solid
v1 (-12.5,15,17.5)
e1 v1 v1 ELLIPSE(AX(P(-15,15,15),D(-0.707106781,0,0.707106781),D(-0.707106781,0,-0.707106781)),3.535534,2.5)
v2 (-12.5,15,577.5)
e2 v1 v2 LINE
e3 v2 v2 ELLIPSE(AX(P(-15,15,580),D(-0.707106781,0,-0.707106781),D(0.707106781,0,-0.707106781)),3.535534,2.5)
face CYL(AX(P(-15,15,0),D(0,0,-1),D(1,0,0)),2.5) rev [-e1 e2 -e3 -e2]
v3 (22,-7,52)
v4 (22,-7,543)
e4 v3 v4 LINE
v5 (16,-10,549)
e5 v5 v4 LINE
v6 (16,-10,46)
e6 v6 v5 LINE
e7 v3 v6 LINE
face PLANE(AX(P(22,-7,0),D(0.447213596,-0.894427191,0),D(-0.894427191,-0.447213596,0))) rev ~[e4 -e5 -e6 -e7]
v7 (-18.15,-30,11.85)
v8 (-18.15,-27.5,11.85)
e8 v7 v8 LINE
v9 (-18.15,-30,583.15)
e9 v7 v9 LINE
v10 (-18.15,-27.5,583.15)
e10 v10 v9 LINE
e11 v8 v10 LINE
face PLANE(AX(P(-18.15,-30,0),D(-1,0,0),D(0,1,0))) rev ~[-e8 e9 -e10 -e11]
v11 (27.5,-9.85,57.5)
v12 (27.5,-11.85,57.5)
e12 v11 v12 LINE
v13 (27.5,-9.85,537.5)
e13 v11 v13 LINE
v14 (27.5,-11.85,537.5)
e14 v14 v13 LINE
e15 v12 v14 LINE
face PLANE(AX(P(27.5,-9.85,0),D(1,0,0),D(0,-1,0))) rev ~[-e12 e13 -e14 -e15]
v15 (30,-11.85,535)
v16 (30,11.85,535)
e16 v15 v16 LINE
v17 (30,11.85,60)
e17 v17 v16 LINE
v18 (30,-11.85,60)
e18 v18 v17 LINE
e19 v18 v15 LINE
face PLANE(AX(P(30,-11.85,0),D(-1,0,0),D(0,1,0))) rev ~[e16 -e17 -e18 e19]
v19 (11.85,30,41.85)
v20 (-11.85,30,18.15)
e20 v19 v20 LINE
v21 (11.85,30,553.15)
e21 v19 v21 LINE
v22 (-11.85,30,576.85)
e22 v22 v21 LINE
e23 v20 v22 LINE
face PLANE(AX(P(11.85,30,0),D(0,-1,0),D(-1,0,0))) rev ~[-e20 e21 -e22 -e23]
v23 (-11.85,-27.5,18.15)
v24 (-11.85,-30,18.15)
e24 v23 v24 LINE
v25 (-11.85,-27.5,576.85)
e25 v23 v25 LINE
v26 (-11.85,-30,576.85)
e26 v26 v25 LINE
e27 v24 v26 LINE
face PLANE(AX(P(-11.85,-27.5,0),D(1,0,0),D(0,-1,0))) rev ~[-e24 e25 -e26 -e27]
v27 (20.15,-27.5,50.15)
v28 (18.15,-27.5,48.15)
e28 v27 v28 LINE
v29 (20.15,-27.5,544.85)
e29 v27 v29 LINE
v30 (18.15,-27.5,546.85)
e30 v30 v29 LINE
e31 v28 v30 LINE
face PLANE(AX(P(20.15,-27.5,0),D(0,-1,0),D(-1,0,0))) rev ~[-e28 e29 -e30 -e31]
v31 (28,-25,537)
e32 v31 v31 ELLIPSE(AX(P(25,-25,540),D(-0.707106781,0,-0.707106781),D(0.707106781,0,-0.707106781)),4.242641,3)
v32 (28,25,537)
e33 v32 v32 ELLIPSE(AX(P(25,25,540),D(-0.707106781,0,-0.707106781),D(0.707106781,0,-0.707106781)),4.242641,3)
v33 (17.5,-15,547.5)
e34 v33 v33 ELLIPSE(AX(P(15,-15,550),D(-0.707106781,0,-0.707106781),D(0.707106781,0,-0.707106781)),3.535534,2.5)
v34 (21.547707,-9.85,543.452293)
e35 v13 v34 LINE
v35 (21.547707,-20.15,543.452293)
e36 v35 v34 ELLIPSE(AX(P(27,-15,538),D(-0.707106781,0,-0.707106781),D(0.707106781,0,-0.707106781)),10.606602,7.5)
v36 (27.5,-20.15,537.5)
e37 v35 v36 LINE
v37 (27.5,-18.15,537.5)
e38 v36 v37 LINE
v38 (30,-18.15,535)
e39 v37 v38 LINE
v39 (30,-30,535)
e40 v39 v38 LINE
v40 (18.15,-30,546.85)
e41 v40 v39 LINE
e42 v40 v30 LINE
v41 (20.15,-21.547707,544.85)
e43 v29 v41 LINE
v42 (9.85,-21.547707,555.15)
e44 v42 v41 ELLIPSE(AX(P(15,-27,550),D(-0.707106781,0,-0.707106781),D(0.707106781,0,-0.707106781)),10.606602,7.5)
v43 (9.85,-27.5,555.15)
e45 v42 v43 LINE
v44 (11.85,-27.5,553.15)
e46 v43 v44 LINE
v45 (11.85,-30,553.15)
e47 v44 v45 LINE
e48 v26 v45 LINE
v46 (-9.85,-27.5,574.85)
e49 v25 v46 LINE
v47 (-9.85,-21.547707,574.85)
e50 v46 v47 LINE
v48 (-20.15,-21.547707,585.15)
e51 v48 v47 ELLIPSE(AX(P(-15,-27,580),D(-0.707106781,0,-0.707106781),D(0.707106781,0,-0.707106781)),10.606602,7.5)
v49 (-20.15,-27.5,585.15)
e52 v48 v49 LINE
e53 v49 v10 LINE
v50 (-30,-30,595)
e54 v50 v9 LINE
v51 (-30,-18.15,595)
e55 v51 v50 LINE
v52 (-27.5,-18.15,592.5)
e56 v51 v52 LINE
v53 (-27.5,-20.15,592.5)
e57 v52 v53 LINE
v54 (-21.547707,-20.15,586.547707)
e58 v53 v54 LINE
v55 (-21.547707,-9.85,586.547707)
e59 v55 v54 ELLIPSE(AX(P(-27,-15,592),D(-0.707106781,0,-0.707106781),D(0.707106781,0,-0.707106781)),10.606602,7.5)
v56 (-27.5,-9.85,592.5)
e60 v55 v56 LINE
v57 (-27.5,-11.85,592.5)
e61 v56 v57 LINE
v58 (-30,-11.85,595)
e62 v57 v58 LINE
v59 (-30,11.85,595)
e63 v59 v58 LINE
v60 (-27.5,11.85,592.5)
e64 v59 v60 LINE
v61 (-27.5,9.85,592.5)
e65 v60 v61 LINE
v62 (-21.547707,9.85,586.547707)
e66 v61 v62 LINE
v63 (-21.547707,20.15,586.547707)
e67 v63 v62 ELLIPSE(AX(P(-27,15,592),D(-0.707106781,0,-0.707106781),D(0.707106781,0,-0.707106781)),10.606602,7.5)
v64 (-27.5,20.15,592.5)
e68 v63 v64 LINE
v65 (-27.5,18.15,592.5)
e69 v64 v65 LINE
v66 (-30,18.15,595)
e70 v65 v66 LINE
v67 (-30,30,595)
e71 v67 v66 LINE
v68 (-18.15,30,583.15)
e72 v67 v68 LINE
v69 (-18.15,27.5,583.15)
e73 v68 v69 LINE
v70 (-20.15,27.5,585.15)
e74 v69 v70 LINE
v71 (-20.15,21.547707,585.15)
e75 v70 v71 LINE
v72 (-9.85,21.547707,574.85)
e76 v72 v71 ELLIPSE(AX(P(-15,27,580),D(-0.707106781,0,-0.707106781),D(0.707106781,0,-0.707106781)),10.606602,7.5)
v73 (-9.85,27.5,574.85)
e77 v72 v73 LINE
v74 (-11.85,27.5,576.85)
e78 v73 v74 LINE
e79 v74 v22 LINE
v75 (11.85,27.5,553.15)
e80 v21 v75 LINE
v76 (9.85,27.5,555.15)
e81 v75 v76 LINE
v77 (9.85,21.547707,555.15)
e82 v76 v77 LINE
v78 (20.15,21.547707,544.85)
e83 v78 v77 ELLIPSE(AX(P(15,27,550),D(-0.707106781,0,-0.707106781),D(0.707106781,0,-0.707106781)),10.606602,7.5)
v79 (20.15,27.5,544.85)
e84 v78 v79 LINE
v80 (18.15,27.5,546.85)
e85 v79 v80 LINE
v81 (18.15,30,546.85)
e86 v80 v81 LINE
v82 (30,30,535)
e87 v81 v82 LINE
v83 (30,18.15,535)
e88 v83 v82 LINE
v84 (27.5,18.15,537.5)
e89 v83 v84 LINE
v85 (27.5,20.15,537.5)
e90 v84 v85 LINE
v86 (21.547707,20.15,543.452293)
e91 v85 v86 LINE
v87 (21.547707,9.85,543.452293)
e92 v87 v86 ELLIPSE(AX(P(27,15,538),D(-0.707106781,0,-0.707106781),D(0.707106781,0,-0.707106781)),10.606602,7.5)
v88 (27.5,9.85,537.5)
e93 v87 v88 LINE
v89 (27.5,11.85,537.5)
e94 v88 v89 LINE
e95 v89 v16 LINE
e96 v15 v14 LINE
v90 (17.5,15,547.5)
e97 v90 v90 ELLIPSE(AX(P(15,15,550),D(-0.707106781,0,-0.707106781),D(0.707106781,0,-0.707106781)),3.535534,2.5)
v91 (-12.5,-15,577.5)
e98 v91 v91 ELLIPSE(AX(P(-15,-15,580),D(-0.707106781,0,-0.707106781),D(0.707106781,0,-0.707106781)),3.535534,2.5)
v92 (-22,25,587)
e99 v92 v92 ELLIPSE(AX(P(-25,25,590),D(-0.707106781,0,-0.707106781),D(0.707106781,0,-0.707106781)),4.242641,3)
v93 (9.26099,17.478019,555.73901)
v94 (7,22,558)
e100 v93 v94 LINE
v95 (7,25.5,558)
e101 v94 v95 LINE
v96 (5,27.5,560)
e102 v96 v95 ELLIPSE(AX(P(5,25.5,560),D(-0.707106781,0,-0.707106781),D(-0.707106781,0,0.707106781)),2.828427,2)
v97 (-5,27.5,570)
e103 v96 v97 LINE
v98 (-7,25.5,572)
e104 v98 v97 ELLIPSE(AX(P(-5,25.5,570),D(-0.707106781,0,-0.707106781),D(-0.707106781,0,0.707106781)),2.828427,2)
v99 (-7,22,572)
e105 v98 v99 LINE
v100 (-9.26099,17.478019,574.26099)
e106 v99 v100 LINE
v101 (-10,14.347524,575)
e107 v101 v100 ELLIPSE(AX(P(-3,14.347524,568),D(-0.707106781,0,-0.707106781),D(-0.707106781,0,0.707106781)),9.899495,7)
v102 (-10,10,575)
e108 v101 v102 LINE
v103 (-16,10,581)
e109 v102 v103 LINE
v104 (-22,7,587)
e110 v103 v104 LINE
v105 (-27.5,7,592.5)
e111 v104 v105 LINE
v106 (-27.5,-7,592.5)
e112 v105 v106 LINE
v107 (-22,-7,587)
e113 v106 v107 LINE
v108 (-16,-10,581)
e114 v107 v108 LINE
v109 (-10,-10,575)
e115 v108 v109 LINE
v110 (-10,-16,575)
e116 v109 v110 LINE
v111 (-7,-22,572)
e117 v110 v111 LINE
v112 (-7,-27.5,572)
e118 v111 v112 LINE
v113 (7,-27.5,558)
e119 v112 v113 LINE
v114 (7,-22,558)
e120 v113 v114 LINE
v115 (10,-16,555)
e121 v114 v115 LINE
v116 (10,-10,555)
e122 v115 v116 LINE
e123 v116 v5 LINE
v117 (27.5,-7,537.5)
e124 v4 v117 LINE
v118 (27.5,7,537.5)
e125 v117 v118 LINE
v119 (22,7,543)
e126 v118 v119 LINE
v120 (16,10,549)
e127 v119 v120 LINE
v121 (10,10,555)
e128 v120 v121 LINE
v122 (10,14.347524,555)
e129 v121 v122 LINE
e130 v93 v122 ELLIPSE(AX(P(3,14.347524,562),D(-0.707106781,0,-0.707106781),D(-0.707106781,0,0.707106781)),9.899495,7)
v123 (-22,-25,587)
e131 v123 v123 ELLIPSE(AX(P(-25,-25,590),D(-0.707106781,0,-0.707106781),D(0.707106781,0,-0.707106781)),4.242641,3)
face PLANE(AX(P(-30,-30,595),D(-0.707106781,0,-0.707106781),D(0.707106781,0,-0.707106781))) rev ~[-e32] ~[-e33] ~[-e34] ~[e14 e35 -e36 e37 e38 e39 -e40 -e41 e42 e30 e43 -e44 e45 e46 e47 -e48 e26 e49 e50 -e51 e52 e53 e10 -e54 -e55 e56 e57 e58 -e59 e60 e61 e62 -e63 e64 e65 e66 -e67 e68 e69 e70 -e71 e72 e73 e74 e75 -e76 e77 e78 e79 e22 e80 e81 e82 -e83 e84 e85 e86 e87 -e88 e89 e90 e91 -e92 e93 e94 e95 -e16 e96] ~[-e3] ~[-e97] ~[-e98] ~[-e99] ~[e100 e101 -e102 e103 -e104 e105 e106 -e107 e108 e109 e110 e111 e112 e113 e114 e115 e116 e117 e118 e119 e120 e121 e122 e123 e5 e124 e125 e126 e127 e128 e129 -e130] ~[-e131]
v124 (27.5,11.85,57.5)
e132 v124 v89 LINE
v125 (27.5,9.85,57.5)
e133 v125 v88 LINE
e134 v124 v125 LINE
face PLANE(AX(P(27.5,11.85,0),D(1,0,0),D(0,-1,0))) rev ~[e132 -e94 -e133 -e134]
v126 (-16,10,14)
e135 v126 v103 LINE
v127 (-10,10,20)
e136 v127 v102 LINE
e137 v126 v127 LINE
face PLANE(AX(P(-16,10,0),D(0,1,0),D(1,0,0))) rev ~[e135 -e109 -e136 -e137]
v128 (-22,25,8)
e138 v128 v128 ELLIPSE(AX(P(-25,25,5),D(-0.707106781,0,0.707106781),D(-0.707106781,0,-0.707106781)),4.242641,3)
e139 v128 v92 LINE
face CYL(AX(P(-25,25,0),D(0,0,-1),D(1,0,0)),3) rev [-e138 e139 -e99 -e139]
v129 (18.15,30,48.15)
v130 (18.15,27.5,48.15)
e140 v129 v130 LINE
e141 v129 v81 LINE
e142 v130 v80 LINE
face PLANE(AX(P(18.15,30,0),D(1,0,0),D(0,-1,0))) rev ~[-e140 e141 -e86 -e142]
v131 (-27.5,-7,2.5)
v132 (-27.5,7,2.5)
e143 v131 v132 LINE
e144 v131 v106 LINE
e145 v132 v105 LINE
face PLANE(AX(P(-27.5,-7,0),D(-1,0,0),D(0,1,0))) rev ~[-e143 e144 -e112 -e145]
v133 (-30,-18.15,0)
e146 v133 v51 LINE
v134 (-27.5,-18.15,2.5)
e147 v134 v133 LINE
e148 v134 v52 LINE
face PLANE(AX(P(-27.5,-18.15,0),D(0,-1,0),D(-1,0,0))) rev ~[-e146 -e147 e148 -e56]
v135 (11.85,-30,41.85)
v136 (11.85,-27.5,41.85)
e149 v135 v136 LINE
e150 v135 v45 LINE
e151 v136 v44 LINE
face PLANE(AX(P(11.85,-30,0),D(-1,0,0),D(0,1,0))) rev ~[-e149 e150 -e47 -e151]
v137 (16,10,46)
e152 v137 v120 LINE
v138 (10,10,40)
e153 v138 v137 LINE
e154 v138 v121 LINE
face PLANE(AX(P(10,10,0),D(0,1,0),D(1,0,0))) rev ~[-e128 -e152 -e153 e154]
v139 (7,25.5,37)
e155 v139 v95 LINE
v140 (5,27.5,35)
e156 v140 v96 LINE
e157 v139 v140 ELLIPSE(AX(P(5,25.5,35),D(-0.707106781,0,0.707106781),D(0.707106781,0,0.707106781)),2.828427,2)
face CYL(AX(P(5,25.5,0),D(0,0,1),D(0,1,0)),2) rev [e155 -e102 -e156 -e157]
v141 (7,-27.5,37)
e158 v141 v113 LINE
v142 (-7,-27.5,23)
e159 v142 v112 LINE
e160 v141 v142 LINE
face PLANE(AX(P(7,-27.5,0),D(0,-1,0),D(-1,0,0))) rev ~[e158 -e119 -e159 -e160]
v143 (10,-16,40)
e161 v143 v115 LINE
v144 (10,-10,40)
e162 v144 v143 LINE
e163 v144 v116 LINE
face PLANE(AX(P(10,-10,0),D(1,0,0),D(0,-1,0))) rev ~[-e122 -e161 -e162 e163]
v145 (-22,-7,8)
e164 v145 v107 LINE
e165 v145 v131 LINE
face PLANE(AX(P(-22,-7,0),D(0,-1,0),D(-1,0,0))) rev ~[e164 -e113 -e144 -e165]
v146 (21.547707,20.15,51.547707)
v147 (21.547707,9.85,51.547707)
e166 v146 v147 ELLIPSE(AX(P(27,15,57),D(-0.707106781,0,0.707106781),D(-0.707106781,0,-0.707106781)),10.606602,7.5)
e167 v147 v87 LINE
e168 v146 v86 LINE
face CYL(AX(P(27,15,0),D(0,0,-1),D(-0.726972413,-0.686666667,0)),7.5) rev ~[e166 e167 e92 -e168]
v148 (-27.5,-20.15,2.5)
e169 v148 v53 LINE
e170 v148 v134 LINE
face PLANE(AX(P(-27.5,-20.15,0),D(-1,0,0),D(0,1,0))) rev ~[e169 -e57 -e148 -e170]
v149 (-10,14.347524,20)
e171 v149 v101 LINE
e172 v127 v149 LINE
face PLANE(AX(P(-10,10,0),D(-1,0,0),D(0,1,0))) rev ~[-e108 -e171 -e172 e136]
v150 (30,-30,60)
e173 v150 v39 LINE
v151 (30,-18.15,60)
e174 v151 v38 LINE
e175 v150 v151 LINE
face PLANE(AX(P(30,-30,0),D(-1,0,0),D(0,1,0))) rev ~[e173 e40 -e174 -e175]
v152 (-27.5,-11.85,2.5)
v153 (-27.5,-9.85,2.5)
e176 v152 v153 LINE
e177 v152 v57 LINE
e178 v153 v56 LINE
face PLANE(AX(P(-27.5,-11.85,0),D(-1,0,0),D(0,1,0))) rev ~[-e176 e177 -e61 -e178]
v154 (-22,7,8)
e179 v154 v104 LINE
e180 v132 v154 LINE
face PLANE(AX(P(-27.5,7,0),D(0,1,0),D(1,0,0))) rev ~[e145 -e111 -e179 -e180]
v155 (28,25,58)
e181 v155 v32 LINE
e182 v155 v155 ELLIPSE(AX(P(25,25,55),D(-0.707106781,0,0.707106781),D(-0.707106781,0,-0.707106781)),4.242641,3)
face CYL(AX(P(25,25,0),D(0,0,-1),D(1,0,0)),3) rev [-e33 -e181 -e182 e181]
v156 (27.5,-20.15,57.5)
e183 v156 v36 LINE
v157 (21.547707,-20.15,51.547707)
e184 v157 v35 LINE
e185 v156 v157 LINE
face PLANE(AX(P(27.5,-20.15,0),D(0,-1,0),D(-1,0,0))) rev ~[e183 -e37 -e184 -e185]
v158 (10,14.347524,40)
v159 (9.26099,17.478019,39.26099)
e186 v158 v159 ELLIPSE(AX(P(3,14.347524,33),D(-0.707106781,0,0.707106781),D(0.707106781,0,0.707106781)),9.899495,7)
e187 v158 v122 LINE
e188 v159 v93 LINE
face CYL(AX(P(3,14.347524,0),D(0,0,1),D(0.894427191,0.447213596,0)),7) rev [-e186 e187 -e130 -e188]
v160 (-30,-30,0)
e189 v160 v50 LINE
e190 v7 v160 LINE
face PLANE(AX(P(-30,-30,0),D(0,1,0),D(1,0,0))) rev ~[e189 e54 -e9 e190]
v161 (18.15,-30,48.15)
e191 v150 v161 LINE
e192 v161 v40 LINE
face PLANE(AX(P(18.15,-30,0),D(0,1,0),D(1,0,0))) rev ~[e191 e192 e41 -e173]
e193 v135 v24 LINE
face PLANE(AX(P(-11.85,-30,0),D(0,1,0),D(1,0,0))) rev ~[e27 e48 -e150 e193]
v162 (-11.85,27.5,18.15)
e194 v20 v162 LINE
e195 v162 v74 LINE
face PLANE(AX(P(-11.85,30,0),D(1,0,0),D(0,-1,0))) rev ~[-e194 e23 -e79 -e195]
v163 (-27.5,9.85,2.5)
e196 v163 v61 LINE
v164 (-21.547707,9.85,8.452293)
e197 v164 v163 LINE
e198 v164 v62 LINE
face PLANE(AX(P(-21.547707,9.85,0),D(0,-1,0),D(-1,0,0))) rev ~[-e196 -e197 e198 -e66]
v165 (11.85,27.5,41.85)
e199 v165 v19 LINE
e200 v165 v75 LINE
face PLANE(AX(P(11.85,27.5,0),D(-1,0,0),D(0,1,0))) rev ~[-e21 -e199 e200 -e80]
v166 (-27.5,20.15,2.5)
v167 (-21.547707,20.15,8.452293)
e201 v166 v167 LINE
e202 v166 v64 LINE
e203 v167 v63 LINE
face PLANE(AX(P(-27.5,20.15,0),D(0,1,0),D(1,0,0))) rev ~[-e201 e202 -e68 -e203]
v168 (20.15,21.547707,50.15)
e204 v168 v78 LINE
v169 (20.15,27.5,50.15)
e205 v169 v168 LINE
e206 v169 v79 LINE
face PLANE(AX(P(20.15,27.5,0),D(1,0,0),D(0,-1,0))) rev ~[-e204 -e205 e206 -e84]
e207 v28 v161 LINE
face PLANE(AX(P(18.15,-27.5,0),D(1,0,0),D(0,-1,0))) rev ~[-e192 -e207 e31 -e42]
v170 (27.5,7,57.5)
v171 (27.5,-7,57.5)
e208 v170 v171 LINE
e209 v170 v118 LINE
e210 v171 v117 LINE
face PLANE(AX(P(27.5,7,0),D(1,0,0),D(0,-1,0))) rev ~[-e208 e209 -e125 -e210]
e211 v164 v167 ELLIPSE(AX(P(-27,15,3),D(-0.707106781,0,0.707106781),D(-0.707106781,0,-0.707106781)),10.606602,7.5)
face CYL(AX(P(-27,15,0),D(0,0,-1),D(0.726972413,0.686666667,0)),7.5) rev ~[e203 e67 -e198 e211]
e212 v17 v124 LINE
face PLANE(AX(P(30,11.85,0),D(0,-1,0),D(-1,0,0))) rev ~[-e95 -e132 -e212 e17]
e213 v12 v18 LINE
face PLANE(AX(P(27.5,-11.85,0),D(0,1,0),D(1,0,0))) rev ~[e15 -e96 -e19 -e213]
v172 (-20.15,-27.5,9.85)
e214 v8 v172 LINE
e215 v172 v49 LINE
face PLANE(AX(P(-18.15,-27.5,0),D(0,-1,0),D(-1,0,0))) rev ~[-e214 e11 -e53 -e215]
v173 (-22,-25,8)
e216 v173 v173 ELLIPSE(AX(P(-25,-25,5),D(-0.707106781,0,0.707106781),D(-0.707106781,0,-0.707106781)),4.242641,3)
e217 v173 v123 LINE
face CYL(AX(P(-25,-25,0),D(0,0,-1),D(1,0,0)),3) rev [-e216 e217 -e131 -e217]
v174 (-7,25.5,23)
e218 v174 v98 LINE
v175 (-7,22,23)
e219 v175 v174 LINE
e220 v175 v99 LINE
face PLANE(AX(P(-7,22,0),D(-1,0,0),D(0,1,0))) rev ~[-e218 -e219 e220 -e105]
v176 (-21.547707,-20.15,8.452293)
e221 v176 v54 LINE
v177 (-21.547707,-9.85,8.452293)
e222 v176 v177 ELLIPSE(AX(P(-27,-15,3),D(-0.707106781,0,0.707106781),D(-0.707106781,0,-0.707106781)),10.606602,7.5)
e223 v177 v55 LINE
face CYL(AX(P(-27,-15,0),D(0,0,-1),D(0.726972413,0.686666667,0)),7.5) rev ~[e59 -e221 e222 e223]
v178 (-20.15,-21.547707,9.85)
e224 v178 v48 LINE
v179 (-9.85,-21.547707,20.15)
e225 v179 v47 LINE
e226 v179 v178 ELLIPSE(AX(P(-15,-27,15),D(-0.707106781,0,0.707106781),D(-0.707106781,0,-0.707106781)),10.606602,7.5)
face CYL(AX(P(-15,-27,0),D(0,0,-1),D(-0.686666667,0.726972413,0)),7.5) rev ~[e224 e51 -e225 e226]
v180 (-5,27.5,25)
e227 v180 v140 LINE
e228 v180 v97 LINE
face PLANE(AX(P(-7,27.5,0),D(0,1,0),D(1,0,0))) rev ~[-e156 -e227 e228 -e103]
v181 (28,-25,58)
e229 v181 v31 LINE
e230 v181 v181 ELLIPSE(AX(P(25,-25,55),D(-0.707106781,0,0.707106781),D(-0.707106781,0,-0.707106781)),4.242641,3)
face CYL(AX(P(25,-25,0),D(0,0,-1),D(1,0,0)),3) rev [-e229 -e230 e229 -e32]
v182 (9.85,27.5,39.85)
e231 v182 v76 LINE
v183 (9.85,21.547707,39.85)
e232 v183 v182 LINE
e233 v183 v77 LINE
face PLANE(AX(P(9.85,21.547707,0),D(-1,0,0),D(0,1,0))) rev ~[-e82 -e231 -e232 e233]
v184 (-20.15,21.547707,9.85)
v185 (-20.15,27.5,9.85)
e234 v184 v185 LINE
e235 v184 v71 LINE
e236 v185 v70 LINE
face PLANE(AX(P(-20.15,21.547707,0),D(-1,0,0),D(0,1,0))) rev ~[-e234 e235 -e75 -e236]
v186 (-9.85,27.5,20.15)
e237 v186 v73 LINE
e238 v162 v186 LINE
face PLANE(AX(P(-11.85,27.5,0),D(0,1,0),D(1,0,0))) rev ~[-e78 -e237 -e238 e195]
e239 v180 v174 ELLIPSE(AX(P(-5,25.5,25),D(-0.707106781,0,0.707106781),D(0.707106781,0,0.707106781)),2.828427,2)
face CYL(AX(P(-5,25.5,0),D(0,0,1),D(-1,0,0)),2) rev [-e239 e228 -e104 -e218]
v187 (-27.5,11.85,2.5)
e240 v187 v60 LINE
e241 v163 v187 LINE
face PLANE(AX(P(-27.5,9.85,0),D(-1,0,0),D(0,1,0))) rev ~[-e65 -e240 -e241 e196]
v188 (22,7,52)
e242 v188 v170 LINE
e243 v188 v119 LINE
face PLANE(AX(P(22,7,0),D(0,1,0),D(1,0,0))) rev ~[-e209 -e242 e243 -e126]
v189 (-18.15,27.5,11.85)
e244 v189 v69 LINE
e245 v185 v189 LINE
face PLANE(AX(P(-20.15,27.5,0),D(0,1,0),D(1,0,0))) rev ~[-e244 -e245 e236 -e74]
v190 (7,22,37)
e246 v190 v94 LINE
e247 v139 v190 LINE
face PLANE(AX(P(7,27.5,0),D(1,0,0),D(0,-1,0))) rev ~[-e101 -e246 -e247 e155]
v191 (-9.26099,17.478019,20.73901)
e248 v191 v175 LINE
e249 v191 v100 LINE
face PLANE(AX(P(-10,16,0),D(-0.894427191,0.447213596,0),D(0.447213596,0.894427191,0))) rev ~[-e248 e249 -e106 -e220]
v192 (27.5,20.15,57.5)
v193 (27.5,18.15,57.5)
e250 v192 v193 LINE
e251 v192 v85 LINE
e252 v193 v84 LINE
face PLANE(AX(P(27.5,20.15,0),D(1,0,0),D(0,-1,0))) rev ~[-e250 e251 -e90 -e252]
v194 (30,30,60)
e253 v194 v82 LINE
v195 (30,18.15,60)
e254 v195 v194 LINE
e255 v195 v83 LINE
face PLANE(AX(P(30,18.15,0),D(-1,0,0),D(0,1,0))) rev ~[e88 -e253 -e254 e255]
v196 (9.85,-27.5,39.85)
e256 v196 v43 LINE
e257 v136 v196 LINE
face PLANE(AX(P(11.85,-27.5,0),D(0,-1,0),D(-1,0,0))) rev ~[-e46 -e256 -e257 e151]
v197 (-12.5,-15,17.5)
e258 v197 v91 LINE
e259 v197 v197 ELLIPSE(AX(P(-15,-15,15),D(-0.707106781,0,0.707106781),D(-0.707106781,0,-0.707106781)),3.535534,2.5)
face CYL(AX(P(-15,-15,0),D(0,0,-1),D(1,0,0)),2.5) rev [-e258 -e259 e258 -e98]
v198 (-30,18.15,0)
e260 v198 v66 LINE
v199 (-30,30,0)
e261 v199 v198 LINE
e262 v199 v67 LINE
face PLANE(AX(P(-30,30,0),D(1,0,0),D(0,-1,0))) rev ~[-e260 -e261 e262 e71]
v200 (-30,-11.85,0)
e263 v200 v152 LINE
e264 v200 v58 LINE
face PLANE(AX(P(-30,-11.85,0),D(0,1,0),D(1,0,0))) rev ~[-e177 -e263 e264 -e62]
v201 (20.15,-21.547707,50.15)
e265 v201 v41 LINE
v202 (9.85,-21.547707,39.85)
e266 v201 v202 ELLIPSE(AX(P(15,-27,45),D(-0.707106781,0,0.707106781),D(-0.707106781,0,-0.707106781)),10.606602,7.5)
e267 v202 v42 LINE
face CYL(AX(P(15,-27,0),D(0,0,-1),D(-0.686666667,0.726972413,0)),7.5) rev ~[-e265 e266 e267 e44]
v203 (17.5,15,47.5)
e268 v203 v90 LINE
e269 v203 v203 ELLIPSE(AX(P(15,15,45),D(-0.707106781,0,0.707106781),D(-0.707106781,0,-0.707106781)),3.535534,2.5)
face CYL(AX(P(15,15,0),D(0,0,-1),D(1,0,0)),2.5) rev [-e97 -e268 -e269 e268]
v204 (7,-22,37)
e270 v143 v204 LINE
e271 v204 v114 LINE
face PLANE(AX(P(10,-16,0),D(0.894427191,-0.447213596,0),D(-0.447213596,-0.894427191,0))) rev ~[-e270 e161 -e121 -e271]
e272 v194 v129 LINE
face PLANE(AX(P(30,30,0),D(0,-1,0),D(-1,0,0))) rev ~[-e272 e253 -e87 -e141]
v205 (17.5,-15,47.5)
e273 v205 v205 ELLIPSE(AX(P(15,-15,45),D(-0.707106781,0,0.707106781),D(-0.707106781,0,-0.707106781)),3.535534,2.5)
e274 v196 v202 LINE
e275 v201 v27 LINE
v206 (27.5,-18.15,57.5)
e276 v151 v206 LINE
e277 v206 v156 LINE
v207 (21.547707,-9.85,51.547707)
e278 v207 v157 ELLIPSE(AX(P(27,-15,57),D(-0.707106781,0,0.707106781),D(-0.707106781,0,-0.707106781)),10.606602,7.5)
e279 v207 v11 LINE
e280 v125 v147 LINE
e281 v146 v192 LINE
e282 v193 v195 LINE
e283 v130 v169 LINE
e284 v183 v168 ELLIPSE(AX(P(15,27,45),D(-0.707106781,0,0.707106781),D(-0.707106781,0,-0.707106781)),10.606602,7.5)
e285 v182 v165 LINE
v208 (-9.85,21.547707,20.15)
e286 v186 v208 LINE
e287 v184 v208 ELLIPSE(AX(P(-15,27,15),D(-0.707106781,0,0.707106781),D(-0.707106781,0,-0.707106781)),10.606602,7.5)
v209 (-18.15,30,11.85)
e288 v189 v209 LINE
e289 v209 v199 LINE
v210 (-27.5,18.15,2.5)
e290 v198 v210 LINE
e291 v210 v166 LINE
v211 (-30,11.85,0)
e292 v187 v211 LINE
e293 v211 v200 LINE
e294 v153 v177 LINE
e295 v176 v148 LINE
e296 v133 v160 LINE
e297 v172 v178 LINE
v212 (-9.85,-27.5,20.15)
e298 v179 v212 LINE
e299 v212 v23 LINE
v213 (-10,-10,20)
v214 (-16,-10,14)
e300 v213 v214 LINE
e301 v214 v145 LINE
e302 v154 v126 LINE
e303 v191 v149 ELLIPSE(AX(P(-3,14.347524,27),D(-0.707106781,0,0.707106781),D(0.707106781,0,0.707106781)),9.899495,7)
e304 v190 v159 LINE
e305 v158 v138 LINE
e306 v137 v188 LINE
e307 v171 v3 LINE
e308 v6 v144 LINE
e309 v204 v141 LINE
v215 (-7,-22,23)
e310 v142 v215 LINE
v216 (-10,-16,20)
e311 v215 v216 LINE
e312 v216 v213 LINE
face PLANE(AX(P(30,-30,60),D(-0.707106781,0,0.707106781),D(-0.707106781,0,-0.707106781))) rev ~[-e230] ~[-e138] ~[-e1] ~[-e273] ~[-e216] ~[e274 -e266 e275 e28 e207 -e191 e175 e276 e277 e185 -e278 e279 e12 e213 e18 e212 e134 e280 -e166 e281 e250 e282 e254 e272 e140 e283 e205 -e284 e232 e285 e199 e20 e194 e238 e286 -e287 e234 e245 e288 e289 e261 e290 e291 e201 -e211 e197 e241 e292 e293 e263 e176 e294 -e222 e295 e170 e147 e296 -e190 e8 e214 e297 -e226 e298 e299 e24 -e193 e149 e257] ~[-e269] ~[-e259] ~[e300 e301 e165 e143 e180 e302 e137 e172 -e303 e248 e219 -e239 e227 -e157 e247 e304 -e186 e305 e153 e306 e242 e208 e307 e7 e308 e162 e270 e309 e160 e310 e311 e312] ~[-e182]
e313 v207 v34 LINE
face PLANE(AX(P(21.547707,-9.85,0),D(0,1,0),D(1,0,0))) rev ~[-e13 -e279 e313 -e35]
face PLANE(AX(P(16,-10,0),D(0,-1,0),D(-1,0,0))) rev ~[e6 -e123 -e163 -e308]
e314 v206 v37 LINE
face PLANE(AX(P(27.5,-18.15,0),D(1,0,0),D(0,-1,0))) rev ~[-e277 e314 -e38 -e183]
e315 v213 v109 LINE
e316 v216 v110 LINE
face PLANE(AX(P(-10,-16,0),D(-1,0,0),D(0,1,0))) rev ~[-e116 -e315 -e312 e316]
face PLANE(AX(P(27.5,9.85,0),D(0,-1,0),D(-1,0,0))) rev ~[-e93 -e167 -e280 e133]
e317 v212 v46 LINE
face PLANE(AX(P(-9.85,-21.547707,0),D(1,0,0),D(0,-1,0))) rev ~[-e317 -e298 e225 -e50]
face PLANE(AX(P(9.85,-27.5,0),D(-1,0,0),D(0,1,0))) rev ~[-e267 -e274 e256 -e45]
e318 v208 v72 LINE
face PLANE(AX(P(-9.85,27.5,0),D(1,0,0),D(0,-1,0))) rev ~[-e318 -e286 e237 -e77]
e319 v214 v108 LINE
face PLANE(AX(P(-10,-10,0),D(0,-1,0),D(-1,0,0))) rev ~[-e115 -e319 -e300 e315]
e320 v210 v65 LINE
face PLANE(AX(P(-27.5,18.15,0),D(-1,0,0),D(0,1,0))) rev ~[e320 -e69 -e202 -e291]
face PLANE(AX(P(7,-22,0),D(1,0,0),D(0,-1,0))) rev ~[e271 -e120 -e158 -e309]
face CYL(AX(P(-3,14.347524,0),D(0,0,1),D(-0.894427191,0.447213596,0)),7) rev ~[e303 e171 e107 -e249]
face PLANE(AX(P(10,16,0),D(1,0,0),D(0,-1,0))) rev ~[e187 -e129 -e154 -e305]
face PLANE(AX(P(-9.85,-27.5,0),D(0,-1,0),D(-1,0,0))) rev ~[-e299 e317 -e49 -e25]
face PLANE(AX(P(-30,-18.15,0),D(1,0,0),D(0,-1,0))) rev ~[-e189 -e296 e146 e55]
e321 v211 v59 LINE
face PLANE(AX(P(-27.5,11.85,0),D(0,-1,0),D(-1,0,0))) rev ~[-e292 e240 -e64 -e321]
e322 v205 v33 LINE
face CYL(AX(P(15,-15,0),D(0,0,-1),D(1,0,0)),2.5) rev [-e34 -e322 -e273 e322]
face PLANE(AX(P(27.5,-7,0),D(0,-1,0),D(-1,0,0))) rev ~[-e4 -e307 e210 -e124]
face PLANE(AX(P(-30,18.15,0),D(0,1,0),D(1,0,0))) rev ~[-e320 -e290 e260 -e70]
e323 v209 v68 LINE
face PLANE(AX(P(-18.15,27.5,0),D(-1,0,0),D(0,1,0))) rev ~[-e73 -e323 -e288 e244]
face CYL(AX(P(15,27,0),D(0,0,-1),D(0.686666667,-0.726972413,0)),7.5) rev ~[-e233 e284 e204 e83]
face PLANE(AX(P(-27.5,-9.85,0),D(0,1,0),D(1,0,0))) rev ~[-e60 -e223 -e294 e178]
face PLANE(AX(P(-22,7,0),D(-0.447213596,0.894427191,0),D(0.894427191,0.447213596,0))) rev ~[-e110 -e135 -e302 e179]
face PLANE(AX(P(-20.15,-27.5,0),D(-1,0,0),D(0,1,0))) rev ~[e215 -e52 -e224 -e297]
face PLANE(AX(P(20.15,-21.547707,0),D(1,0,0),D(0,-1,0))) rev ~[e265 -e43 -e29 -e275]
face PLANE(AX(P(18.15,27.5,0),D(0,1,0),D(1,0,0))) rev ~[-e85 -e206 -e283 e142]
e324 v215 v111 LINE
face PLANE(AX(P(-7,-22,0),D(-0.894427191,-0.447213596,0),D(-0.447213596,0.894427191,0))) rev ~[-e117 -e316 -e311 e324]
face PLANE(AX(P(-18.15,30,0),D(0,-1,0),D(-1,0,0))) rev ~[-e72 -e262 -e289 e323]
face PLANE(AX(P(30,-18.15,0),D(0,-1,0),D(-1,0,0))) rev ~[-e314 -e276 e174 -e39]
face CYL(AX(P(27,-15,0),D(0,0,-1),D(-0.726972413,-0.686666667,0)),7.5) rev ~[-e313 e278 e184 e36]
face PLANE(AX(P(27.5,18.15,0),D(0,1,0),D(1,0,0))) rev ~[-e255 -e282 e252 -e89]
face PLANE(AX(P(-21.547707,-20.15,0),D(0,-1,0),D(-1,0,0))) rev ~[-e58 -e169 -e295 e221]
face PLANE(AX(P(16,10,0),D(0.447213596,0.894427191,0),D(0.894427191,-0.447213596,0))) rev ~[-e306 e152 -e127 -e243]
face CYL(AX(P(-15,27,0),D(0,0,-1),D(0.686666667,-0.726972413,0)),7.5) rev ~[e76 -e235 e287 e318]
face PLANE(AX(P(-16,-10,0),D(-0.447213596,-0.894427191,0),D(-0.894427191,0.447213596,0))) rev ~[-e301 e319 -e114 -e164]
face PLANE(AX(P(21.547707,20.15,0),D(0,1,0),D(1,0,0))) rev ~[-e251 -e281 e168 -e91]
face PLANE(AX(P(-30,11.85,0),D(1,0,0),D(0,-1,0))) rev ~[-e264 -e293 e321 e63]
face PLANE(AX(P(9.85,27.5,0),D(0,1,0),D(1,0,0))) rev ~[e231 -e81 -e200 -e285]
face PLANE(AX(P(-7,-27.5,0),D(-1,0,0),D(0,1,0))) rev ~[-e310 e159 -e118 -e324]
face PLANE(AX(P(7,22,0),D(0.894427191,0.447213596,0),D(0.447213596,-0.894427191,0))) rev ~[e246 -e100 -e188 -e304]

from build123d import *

# Parameters (mm, degrees)
F0_R     = 3
F0_R_2   = 2.5
F1_DEPTH = 595
F2_R     = 2
F3_R     = 7
F5_DEPTH = 60


# Not quite as in the source:
# - a feature names something its author has since deleted; it is built from what else it names


with BuildPart() as f1:
    # F0 (on Top) → F1 (new body)
    with BuildSketch(Plane.XY):
        with BuildLine():
            Line((18.15, -30), (30, -30))
            Line((30, -30), (30, -18.15))
            Line((30, -18.15), (27.5, -18.15))
            Line((27.5, -18.15), (27.5, -20.15))
            Line((27.5, -20.15), (21.5477069044, -20.15))
            ThreePointArc((21.5477069044, -20.15), (19.5, -15), (21.5477069044, -9.85))
            Line((21.5477069044, -9.85), (27.5, -9.85))
            Line((27.5, -9.85), (27.5, -11.85))
            Line((27.5, -11.85), (30, -11.85))
            Line((30, -11.85), (30, 11.85))
            Line((30, 11.85), (27.5, 11.85))
            Line((27.5, 11.85), (27.5, 9.85))
            Line((27.5, 9.85), (21.5477069044, 9.85))
            ThreePointArc((21.5477069044, 9.85), (19.5, 15), (21.5477069044, 20.15))
            Line((21.5477069044, 20.15), (27.5, 20.15))
            Line((27.5, 20.15), (27.5, 18.15))
            Line((27.5, 18.15), (30, 18.15))
            Line((30, 18.15), (30, 30))
            Line((30, 30), (18.15, 30))
            Line((18.15, 30), (18.15, 27.5))
            Line((18.15, 27.5), (20.15, 27.5))
            Line((20.15, 27.5), (20.15, 21.5477069044))
            ThreePointArc((20.15, 21.5477069044), (15, 19.5), (9.85, 21.5477069044))
            Line((9.85, 21.5477069044), (9.85, 27.5))
            Line((9.85, 27.5), (11.85, 27.5))
            Line((11.85, 27.5), (11.85, 30))
            Line((11.85, 30), (-11.85, 30))
            Line((-11.85, 30), (-11.85, 27.5))
            Line((-11.85, 27.5), (-9.85, 27.5))
            Line((-9.85, 27.5), (-9.85, 21.5477069044))
            ThreePointArc((-9.85, 21.5477069044), (-15, 19.5), (-20.15, 21.5477069044))
            Line((-20.15, 21.5477069044), (-20.15, 27.5))
            Line((-20.15, 27.5), (-18.15, 27.5))
            Line((-18.15, 27.5), (-18.15, 30))
            Line((-18.15, 30), (-30, 30))
            Line((-30, 30), (-30, 18.15))
            Line((-30, 18.15), (-27.5, 18.15))
            Line((-27.5, 18.15), (-27.5, 20.15))
            Line((-27.5, 20.15), (-21.5477069044, 20.15))
            ThreePointArc((-21.5477069044, 20.15), (-19.5, 15), (-21.5477069044, 9.85))
            Line((-21.5477069044, 9.85), (-27.5, 9.85))
            Line((-27.5, 9.85), (-27.5, 11.85))
            Line((-27.5, 11.85), (-30, 11.85))
            Line((-30, 11.85), (-30, -11.85))
            Line((-30, -11.85), (-27.5, -11.85))
            Line((-27.5, -11.85), (-27.5, -9.85))
            Line((-27.5, -9.85), (-21.5477069044, -9.85))
            ThreePointArc((-21.5477069044, -9.85), (-19.5, -15), (-21.5477069044, -20.15))
            Line((-21.5477069044, -20.15), (-27.5, -20.15))
            Line((-27.5, -20.15), (-27.5, -18.15))
            Line((-27.5, -18.15), (-30, -18.15))
            Line((-30, -18.15), (-30, -30))
            Line((-30, -30), (-18.15, -30))
            Line((-18.15, -30), (-18.15, -27.5))
            Line((-18.15, -27.5), (-20.15, -27.5))
            Line((-20.15, -27.5), (-20.15, -21.5477069044))
            ThreePointArc((-20.15, -21.5477069044), (-15, -19.5), (-9.85, -21.5477069044))
            Line((-9.85, -21.5477069044), (-9.85, -27.5))
            Line((-9.85, -27.5), (-11.85, -27.5))
            Line((-11.85, -27.5), (-11.85, -30))
            Line((-11.85, -30), (11.85, -30))
            Line((11.85, -30), (11.85, -27.5))
            Line((11.85, -27.5), (9.85, -27.5))
            Line((9.85, -27.5), (9.85, -21.5477069044))
            ThreePointArc((9.85, -21.5477069044), (15, -19.5), (20.15, -21.5477069044))
            Line((20.15, -21.5477069044), (20.15, -27.5))
            Line((20.15, -27.5), (18.15, -27.5))
            Line((18.15, -27.5), (18.15, -30))
        make_face()
        with Locations((-25, -25)):
            Circle(F0_R, mode=Mode.SUBTRACT)
        with Locations((-15, -15)):
            Circle(F0_R_2, mode=Mode.SUBTRACT)
        with Locations((25, -25)):
            Circle(F0_R, mode=Mode.SUBTRACT)
        with Locations((15, -15)):
            Circle(F0_R_2, mode=Mode.SUBTRACT)
        with Locations((-25, 25)):
            Circle(F0_R, mode=Mode.SUBTRACT)
        with Locations((-15, 15)):
            Circle(F0_R_2, mode=Mode.SUBTRACT)
        Polygon((-7, 22), (-7, 27.5), (0, 27.5), (7, 27.5), (7, 22), (10, 16), (10, 10), (16, 10), (22, 7), (27.5, 7), (27.5, 0), (27.5, -7), (22, -7), (16, -10), (10, -10), (10, -16), (7, -22), (7, -27.5), (0, -27.5), (-7, -27.5), (-7, -22), (-10, -16), (-10, -10), (-16, -10), (-22, -7), (-27.5, -7), (-27.5, 0), (-27.5, 7), (-22, 7), (-16, 10), (-10, 10), (-10, 16), align=None, mode=Mode.SUBTRACT)
        with Locations((15, 15)):
            Circle(F0_R_2, mode=Mode.SUBTRACT)
        with Locations((25, 25)):
            Circle(F0_R, mode=Mode.SUBTRACT)
    extrude(amount=F1_DEPTH)

    # F2
    f2_edges = [f1.edges().sort_by_distance(p)[0] for p in [
        (-7, 27.5, 297.5),
        (7, 27.5, 297.5),
    ]]
    fillet(f2_edges, radius=F2_R)

    # F3
    f3_edges = [f1.edges().sort_by_distance(p)[0] for p in [
        (-10, 16, 297.5),
        (10, 16, 297.5),
    ]]
    fillet(f3_edges, radius=F3_R)

    # F4 (on face) → F5 (cut)
    with BuildSketch(Plane.XZ.offset(30)):
        Polygon((30, 0), (30, 60), (-30, 0), (-18.15, 0), align=None)
        Polygon((30, 535), (30, 595), (-18.15, 595), (-30, 595), align=None)
    extrude(amount=-F5_DEPTH, mode=Mode.SUBTRACT)


solid = f1.part
